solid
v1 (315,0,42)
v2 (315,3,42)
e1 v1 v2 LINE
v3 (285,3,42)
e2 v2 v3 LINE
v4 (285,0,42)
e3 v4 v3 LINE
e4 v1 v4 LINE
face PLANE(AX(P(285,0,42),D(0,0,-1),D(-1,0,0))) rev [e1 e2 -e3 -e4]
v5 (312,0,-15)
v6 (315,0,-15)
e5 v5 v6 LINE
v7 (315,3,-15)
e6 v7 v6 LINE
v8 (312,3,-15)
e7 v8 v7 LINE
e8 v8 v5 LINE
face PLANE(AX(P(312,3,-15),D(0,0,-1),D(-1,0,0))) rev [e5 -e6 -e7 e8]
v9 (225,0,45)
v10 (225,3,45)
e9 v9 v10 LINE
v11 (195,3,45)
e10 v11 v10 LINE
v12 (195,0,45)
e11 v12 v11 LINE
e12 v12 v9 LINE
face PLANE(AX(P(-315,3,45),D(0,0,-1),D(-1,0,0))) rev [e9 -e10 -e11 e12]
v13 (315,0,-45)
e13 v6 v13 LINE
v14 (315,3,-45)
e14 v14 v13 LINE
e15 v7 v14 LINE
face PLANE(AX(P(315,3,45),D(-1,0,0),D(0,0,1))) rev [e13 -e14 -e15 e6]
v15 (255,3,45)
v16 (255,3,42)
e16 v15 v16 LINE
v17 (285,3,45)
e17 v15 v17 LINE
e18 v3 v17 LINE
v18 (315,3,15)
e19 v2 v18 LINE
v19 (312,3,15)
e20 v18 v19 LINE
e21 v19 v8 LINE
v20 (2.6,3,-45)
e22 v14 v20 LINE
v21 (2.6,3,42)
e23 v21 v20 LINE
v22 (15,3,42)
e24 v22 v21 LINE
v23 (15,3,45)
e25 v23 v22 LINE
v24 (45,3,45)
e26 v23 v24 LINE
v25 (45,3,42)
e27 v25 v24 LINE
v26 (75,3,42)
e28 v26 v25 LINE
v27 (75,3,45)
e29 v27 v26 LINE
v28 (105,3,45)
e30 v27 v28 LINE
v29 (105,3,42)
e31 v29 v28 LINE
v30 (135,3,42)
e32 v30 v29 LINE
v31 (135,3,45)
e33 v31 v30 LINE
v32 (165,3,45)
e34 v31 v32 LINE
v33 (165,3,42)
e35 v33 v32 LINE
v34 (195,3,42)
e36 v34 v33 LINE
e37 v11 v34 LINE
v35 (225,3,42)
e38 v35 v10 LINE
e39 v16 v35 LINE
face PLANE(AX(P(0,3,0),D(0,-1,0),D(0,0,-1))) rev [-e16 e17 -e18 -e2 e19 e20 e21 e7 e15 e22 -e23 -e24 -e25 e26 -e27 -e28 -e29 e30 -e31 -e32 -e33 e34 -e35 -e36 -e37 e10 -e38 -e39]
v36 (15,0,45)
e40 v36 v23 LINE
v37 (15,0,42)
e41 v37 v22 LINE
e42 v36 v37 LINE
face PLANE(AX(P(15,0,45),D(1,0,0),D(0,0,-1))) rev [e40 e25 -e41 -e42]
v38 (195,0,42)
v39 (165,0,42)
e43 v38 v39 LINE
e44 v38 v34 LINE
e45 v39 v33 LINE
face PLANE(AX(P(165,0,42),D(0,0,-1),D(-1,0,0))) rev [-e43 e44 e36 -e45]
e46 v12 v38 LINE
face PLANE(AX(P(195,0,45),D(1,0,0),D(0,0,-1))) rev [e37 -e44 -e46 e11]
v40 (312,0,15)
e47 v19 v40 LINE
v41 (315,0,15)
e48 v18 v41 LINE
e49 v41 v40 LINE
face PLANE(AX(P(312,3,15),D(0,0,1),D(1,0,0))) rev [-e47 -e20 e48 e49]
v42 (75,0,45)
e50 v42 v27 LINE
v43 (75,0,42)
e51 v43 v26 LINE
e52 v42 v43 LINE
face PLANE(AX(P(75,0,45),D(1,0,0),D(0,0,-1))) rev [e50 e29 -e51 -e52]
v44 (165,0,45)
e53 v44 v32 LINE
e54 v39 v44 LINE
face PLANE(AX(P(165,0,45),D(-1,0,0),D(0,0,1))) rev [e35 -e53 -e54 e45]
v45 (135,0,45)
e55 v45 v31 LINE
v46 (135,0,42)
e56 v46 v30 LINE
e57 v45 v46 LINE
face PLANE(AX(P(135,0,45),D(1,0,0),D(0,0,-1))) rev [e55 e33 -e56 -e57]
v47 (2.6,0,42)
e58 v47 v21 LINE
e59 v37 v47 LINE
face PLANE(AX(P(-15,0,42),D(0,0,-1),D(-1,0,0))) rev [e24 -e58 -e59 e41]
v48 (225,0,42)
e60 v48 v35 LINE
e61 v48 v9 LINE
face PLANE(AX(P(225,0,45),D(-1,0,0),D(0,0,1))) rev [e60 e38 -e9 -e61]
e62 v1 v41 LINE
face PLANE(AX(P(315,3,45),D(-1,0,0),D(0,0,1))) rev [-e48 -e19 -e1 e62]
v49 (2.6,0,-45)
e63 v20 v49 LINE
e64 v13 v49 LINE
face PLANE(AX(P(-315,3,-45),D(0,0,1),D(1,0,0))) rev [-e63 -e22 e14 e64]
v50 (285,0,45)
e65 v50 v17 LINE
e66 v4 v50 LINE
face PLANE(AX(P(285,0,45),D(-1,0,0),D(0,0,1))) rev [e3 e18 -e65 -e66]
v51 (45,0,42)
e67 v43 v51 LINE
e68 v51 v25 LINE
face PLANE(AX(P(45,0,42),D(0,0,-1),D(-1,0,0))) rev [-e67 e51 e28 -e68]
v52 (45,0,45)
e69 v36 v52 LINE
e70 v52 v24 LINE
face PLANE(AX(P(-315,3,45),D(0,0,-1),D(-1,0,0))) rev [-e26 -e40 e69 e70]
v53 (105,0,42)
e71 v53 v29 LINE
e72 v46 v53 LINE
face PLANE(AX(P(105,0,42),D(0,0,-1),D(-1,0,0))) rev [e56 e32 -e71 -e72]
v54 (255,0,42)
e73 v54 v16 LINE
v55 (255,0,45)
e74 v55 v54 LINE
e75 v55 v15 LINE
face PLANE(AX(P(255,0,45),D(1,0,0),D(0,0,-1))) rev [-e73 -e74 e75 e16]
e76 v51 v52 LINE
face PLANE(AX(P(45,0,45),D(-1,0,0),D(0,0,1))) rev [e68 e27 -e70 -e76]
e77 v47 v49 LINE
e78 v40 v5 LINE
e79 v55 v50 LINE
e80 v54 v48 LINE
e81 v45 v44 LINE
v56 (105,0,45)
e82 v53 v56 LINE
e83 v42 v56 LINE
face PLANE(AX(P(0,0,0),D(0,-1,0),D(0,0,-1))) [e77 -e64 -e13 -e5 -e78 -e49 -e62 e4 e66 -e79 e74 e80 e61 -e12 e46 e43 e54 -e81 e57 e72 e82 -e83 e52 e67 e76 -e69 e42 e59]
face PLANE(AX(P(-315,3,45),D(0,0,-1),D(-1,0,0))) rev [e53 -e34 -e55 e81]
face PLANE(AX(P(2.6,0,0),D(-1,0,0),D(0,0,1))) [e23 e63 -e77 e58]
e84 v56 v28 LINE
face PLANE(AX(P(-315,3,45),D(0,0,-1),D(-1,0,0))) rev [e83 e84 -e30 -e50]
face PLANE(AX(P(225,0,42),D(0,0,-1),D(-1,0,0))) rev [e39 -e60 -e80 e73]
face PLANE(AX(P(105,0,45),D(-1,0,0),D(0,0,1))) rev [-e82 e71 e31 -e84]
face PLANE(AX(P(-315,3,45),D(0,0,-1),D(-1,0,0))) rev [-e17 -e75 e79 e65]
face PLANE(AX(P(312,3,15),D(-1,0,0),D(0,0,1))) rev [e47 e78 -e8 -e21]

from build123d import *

# Parameters (mm, degrees)
SKETCH1_W              = 630
SKETCH1_H              = 90
BOSS_EXTRUDE1_DEPTH    = 3
SKETCH3_W              = 30
SKETCH3_H              = 3
CUT_EXTRUDE1_DEPTH     = 3
LPATTERN1_COUNT        = 10
LPATTERN1_PITCH        = 60
LPATTERN1_COL_COUNT    = 2
LPATTERN1_COL_PITCH    = 60
CUT_EXTRUDE5_START     = -3
CUT_EXTRUDE5_OUTLINE_W = 3
CUT_EXTRUDE5_OUTLINE_H = 30
CUT_EXTRUDE5_DEPTH     = 3
SKETCH7_W              = 3
SKETCH7_H              = 30
CUT_EXTRUDE3_DEPTH     = 3
SKETCH13_W             = 3
SKETCH13_H             = 27
CUT_EXTRUDE4_DEPTH     = 10


# Read off the part's stored shape, not the designer's step: Cut-Extrude5
with BuildPart() as part:
    # Sketch1 → Boss-Extrude1 (new body)
    with BuildSketch(Plane(origin=(0, 0, 0), x_dir=(1, 0, 0), z_dir=(0, 1, 0))):
        Rectangle(SKETCH1_W, SKETCH1_H)
    extrude(amount=BOSS_EXTRUDE1_DEPTH)

    # Sketch3 → Cut-Extrude1 (cut)
    with BuildSketch(Plane(origin=(0, 3, 0), x_dir=(1, 0, 0), z_dir=(0, 1, 0))):
        with Locations((-240, -43.5)):
            Rectangle(SKETCH3_W, SKETCH3_H)
    cut_extrude1 = extrude(amount=-CUT_EXTRUDE1_DEPTH, mode=Mode.SUBTRACT)

    # LPattern1: Cut-Extrude1 ×10
    with Locations(*[(i * LPATTERN1_PITCH, 0, 0) for i in range(1, LPATTERN1_COUNT)]):
        add(cut_extrude1, mode=Mode.SUBTRACT)

    # LPattern1 col: Cut-Extrude1 ×2
    with Locations(*[(-i * LPATTERN1_COL_PITCH, 0, 0) for i in range(1, LPATTERN1_COL_COUNT)]):
        add(cut_extrude1, mode=Mode.SUBTRACT)

    # Cut-Extrude5 outline → Cut-Extrude5 (cut)
    with BuildSketch(Plane(origin=(0, 3, 0), x_dir=(1, 0, 0), z_dir=(0, 1, 0)).offset(CUT_EXTRUDE5_START)):
        with Locations((313.5, 1e-09)):
            Rectangle(CUT_EXTRUDE5_OUTLINE_W, CUT_EXTRUDE5_OUTLINE_H)
    extrude(amount=CUT_EXTRUDE5_DEPTH, mode=Mode.SUBTRACT)

    # Sketch7 → Cut-Extrude3 (cut)
    with BuildSketch(Plane(origin=(0, 3, 0), x_dir=(1, 0, 0), z_dir=(0, 1, 0))):
        with Locations((-313.5, 30)):
            Rectangle(SKETCH7_W, SKETCH7_H)
    extrude(amount=-CUT_EXTRUDE3_DEPTH, mode=Mode.SUBTRACT)

    # Sketch13 → Cut-Extrude4 (cut)
    with BuildSketch(Plane(origin=(0, 3, 0), x_dir=(1, 0, 0), z_dir=(0, 1, 0))):
        with Locations((-313.5, -28.5)):
            Rectangle(SKETCH13_W, SKETCH13_H)
    extrude(amount=-CUT_EXTRUDE4_DEPTH, mode=Mode.SUBTRACT)

    # SurfaceCut1
    split(bisect_by=Plane.ZY.offset(-2.6), keep=Keep.BOTTOM)


solid = part.part
